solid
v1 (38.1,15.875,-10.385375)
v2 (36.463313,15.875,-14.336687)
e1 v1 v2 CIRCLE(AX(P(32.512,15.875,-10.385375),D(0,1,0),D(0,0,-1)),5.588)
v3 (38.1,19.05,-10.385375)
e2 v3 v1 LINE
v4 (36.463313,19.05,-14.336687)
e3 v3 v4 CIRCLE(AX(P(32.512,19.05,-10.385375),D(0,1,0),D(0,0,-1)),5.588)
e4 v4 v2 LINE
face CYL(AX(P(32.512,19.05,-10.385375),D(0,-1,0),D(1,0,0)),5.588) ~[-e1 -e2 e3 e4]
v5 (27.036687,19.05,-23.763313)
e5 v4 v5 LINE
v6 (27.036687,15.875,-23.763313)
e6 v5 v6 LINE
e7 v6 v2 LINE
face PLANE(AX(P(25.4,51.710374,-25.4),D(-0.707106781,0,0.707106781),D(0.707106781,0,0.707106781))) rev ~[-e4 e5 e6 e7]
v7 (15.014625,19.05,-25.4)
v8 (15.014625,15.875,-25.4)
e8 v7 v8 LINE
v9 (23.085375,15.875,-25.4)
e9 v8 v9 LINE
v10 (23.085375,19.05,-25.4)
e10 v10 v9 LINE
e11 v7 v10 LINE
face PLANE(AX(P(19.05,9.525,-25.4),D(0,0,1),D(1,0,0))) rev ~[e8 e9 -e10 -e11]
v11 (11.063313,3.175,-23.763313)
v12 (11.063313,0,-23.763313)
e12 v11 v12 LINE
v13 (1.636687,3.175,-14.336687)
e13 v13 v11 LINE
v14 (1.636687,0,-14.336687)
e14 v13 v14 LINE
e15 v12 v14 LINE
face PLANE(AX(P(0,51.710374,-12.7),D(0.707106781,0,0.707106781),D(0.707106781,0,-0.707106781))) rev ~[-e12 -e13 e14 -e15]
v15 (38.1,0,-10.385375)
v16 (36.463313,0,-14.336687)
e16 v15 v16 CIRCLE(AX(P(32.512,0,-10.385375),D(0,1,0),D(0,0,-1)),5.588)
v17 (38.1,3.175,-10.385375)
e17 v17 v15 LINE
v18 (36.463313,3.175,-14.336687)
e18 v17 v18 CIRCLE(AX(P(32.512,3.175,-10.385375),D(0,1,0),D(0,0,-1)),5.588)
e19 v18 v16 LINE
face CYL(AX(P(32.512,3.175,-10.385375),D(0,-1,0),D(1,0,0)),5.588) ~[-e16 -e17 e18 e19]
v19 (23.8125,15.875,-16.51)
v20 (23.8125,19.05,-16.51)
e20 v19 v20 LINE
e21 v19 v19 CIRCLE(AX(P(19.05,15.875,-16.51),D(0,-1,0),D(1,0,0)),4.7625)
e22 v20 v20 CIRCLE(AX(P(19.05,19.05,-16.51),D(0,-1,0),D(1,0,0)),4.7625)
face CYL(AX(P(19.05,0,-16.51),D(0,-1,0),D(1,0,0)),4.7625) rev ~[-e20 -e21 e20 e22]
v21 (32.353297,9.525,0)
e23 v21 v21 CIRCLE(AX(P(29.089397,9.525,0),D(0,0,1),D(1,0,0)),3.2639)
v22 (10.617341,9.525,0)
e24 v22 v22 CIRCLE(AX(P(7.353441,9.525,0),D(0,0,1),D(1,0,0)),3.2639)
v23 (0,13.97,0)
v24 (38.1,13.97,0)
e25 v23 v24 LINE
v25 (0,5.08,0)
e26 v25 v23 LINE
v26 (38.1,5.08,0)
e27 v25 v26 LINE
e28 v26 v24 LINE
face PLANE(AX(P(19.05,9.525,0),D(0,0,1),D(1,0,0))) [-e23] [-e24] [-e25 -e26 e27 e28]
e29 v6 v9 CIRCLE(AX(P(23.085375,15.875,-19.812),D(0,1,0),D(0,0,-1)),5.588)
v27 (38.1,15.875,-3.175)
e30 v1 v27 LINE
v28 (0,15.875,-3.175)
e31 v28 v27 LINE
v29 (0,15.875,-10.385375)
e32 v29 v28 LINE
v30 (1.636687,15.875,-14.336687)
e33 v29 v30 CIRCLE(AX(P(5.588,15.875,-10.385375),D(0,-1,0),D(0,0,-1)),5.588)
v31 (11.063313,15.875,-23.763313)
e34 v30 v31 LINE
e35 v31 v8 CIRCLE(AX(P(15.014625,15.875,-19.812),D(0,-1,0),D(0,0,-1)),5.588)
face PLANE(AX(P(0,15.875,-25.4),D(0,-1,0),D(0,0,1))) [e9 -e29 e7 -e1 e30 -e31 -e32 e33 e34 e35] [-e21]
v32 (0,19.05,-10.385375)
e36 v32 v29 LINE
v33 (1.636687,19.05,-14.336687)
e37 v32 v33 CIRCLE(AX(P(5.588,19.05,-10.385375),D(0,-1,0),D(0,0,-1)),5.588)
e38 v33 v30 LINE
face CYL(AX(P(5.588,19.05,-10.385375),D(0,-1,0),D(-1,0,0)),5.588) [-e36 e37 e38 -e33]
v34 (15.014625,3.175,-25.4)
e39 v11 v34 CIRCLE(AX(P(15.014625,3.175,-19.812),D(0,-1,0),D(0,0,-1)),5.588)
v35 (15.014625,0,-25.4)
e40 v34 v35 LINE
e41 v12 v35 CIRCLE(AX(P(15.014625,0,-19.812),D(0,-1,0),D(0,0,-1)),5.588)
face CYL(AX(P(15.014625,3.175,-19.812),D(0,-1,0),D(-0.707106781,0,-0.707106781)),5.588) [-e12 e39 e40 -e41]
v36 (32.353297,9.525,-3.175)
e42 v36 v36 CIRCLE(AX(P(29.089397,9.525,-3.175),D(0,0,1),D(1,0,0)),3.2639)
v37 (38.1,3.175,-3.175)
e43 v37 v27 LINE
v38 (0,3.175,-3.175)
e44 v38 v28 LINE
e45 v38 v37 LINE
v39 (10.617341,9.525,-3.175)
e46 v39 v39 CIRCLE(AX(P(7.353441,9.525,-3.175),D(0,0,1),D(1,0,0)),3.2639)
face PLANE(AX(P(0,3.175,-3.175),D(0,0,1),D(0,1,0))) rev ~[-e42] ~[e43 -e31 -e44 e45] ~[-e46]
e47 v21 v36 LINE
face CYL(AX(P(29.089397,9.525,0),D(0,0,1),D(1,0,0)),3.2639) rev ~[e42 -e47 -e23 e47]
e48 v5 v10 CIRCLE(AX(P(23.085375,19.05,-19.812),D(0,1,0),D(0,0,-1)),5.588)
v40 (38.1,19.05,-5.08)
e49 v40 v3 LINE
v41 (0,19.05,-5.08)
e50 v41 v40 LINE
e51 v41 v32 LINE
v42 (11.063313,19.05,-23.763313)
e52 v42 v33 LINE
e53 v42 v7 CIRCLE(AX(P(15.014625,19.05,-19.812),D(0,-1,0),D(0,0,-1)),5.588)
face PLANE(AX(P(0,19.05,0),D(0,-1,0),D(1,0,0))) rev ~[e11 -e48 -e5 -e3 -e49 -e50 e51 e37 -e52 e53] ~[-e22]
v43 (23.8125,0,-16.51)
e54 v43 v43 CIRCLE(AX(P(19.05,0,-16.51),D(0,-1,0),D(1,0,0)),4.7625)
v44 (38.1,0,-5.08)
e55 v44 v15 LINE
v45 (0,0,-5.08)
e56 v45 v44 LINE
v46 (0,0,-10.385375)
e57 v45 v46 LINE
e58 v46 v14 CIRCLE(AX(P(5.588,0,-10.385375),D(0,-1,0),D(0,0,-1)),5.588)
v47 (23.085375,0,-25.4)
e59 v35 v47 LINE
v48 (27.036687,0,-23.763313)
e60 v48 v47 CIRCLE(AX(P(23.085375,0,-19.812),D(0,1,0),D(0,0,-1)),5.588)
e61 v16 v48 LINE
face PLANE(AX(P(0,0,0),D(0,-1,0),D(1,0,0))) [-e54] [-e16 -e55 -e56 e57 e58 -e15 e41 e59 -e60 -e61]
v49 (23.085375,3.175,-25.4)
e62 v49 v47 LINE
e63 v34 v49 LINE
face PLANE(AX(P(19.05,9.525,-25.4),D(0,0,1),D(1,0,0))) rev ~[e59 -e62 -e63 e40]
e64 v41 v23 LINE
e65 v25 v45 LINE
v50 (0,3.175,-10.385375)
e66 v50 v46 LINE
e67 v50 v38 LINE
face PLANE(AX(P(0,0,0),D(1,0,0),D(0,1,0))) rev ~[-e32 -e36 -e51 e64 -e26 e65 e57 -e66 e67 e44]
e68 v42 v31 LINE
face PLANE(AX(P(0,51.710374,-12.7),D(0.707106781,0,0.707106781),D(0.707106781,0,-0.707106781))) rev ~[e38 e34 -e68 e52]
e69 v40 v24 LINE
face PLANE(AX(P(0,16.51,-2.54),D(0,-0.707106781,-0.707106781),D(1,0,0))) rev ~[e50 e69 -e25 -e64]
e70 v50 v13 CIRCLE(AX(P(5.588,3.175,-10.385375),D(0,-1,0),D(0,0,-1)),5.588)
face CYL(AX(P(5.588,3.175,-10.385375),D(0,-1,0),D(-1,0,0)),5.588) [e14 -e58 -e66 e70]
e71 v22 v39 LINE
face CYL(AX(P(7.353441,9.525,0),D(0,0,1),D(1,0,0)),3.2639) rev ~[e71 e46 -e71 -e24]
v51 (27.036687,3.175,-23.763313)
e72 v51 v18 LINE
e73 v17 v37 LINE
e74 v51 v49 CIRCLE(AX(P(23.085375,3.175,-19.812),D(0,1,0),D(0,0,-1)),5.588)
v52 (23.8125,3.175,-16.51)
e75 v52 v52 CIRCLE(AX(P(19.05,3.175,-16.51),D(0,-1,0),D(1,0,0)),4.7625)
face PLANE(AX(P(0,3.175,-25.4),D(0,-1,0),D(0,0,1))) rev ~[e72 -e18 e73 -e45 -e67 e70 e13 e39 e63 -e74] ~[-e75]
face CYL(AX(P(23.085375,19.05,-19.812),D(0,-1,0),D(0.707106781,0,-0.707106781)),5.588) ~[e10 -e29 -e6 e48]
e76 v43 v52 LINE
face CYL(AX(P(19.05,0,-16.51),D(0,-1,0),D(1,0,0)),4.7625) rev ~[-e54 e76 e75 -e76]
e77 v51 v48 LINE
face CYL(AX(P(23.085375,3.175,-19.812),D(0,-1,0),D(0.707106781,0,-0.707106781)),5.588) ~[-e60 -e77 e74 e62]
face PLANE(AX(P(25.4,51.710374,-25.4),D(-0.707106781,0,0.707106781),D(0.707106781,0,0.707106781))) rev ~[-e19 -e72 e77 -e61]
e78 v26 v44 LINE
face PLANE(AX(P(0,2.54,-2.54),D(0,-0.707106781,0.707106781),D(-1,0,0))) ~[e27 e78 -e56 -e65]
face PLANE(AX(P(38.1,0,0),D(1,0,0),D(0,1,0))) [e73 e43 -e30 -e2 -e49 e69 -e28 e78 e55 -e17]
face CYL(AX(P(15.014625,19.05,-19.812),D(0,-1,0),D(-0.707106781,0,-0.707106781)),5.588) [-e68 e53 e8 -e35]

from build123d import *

# Parameters (mm, degrees)
F0_W        = 38.1
F0_H        = 19.05
F1_DEPTH    = 25.4
F2_R        = 3.2639
F3_DEPTH    = 25.4
F4_R        = 4.7625
F5_DEPTH    = 25.4
F6_T1_DEPTH = 84.3707478943
F7_W        = 12.7
F7_H        = 22.225
F8_DEPTH    = 38.1
F9_R        = 5.588
F10_SIZE    = 5.08


# Not quite as in the source:
# - a fillet or chamfer that OpenCascade refuses, or shapes differently, is made with other operations: its cross-section is extruded or revolved along the edge and cut away or added


with BuildPart() as f1:
    # F0 (on Top) → F1 (new body)
    with BuildSketch(Plane.XY):
        with Locations((19.05, 9.525)):
            Rectangle(F0_W, F0_H)
    extrude(amount=-F1_DEPTH)

    # F2 (on face) → F3 (cut)
    with BuildSketch(Plane.XY):
        with Locations((7.3534409022, 9.525)):
            Circle(F2_R)
        with Locations((29.0893973289, 9.525)):
            Circle(F2_R)
    extrude(amount=-F3_DEPTH, mode=Mode.SUBTRACT)

    # F4 (on face) → F5 (cut)
    with BuildSketch(Plane.XZ):
        with Locations((19.05, -16.51)):
            Circle(F4_R)
    extrude(amount=-F5_DEPTH, mode=Mode.SUBTRACT)

    # F6: chamfer of 12.7 on 2 edges, made by hand

    # F6_s2 → F6_t1 (cut)
    with BuildSketch(Plane.XZ.offset(-51.7103739472)):
        Polygon((25.4, -25.4), (38.1, -12.7), (38.1, -25.4), align=None)
        Polygon((0, -12.7), (12.7, -25.4), (0, -25.4), align=None)
    extrude(amount=F6_T1_DEPTH, mode=Mode.SUBTRACT)

    # F7 (on Right) → F8 (cut)
    with BuildSketch(Plane.YZ):
        with Locations((9.525, -14.2875)):
            Rectangle(F7_W, F7_H)
    extrude(amount=F8_DEPTH, mode=Mode.SUBTRACT)

    # F9
    f9_edges = [f1.edges().sort_by_distance(p)[0] for p in [
        (0, 17.4625, -12.7),
        (0, 1.5875, -12.7),
        (12.7, 17.4625, -25.4),
        (12.7, 1.5875, -25.4),
        (25.4, 1.5875, -25.4),
        (25.4, 17.4625, -25.4),
        (38.1, 17.4625, -12.7),
        (38.1, 1.5875, -12.7),
    ]]
    fillet(f9_edges, radius=F9_R)

    # F10
    f10_edges = [f1.edges().sort_by_distance(p)[0] for p in [
        (19.05, 19.05, 0),
        (19.05, 0, 0),
    ]]
    chamfer(f10_edges, length=F10_SIZE)


solid = f1.part
